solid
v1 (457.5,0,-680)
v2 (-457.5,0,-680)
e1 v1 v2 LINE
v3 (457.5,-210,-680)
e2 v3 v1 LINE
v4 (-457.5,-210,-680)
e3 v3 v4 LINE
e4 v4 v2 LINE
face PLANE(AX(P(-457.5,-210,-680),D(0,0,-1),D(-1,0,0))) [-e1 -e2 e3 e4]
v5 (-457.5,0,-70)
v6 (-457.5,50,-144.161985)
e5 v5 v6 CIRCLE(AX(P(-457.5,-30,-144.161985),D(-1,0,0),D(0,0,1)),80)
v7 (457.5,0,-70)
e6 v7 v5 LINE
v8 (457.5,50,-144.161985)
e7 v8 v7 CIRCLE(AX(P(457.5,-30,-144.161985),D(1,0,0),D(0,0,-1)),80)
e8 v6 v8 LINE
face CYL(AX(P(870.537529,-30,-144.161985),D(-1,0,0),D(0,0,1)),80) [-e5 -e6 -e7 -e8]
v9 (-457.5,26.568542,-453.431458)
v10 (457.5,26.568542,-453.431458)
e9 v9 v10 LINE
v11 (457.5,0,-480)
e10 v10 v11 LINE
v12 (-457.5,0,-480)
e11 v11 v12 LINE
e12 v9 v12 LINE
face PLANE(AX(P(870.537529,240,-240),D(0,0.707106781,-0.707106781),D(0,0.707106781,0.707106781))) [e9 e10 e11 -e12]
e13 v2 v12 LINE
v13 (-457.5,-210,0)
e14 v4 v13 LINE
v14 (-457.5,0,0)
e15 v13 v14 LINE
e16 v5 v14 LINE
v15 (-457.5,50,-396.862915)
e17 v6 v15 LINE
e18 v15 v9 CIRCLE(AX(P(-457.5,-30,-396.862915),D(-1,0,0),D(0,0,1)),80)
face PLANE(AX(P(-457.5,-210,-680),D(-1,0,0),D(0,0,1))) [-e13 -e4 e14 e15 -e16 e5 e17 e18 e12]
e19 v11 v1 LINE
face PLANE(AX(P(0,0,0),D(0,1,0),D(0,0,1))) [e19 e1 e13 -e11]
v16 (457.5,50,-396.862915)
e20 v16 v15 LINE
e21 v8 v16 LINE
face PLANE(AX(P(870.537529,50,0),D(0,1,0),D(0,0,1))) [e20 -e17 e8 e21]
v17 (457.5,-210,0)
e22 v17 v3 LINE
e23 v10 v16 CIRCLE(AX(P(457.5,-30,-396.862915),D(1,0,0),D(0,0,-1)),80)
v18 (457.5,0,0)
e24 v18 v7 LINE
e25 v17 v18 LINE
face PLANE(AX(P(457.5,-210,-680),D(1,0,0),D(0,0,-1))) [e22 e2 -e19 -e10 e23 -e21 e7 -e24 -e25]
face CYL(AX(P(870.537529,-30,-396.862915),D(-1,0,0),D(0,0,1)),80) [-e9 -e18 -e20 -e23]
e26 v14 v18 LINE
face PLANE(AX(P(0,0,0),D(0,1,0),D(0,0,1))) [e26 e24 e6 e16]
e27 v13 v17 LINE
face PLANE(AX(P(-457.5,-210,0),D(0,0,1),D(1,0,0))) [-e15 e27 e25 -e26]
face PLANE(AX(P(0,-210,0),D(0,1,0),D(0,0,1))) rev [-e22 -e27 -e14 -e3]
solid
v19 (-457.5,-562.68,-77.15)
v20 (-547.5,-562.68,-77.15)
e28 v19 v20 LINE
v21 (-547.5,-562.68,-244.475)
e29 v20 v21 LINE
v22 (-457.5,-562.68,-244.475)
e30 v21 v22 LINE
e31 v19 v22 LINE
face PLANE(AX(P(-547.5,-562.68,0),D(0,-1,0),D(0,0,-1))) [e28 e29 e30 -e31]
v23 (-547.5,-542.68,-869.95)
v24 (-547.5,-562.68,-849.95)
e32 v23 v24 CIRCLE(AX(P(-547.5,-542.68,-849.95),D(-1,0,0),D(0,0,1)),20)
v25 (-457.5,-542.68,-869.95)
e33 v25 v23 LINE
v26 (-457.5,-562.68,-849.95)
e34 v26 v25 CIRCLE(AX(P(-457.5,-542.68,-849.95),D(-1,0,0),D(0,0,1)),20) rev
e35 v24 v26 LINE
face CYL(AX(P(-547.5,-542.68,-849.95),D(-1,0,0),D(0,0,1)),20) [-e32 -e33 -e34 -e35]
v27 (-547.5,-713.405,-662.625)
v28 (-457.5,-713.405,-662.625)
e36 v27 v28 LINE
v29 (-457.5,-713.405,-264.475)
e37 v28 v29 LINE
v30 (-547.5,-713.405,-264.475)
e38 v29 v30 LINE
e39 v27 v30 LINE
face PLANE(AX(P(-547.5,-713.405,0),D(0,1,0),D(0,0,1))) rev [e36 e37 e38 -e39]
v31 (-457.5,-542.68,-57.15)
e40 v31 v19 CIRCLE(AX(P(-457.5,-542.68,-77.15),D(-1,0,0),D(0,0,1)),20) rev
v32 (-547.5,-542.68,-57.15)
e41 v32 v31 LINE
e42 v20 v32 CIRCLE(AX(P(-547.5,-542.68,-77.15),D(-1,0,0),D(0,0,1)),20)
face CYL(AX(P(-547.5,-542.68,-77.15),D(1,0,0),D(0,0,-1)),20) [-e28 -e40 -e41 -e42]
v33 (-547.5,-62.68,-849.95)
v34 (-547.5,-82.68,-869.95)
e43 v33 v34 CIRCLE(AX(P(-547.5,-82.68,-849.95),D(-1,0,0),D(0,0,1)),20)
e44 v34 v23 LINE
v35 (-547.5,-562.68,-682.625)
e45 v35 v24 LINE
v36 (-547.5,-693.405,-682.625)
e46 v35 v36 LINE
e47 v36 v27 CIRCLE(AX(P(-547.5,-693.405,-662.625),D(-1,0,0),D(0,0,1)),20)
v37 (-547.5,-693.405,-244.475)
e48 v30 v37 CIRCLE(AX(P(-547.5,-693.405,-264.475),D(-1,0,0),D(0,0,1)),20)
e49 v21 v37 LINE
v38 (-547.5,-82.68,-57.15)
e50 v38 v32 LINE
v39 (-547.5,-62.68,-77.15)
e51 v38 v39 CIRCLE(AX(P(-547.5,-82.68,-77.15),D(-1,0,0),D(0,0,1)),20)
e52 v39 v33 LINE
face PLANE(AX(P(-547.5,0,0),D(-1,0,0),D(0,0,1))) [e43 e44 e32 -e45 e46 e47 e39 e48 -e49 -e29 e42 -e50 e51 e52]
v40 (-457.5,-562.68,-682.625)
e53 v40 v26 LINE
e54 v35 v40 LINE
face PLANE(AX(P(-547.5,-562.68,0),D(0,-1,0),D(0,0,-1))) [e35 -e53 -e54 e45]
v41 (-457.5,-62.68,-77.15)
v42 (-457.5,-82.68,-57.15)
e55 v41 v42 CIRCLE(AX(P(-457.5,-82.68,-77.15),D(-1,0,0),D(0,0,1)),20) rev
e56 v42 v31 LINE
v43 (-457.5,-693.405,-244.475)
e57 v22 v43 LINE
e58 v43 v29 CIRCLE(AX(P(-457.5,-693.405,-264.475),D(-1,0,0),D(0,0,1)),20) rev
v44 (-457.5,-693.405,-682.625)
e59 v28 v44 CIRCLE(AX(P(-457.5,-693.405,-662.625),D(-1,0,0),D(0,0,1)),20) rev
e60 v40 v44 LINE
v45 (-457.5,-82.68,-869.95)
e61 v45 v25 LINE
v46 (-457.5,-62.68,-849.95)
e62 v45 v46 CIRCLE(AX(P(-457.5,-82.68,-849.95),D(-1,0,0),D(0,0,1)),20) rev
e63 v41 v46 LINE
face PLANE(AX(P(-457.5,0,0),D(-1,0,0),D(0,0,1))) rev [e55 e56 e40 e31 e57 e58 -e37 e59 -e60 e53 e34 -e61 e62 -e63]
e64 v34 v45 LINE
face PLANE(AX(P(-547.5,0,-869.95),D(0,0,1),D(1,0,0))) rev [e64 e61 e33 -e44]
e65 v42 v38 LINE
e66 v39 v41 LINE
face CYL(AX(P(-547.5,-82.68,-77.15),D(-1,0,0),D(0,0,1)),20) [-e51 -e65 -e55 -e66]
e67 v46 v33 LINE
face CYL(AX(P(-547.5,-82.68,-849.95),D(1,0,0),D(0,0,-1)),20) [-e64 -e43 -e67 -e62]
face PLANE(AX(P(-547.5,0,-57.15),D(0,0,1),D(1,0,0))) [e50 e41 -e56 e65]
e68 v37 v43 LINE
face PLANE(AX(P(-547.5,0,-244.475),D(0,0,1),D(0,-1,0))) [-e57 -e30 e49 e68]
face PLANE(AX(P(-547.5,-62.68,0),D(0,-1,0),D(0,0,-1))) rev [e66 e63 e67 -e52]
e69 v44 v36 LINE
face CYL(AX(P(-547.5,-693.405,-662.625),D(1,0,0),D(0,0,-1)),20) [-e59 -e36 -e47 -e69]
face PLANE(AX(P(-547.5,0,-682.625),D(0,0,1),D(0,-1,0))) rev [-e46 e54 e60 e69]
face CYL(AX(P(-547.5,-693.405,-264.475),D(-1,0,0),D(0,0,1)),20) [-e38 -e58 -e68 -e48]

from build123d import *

# Parameters (mm, degrees)
SKETCH1_W           = 915
SKETCH1_H           = 680
BOSS_EXTRUDE1_DEPTH = 210
BOSS_EXTRUDE2_DEPTH = 915
FILLET1_R           = 80
SKETCH5_W           = 438.15
SKETCH5_H           = 150.725
SKETCH5_W_2         = 622.85
SKETCH5_H_2         = 147.32
BOSS_EXTRUDE3_DEPTH = 90
FILLET2_R           = 20


with BuildPart() as part:
    # Sketch1 → Boss-Extrude1 (new body)
    with BuildSketch(Plane(origin=(0, 0, 0), x_dir=(1, 0, 0), z_dir=(0, 1, 0))):
        with Locations((0, 340)):
            Rectangle(SKETCH1_W, SKETCH1_H)
    extrude(amount=-BOSS_EXTRUDE1_DEPTH)

    # Sketch3 → Boss-Extrude2 (add)
    with BuildSketch(Plane.ZY.offset(457.5)):
        Polygon((-70, 0), (-70, 50), (-430, 50), (-480, 0), align=None)
    extrude(amount=-BOSS_EXTRUDE2_DEPTH)

    # Fillet1
    # the kernel refuses this fillet: 80 mm, written as the material it takes off along each edge
    with BuildSketch(Plane(origin=(-642.904962177, 50, -70), x_dir=(0, -1, 0), z_dir=(1, 0, 0))) as fillet1_piece_1:
        with BuildLine():
            CenterArc((80, 74.161984871), FILLET1_R, 180, 67.975687163)
            Line((0, 74.161984871), (-1.6, 74.161984871))
            Line((-1.6, 74.161984871), (-1.6, 0))
            Line((-1.6, 0), (0, -1.6))
            ThreePointArc((0, -1.6), (25, -1.6), (49.4, -1.483239697))
            Line((49.4, -1.483239697), (50, 0))
        make_face()
    extrude(amount=1285.809924355, mode=Mode.SUBTRACT)
    with BuildSketch(Plane(origin=(-540.342712475, 50, -430), x_dir=(0, -0.7071067811865477, -0.7071067811865474), z_dir=(1, 0, 0))) as fillet1_piece_2:
        with BuildLine():
            CenterArc((FILLET1_R * 0.414213562373, -FILLET1_R), FILLET1_R, 90, 45)
            Line((-FILLET1_R * 0.292893218813, -FILLET1_R * 0.292893218813), (-FILLET1_R * 0.307035354437, -FILLET1_R * 0.27875108319))
            Line((-FILLET1_R * 0.307035354437, -FILLET1_R * 0.27875108319), (-FILLET1_R * 0.00828427124746, FILLET1_R * 0.02))
            Line((-FILLET1_R * 0.00828427124746, FILLET1_R * 0.02), (FILLET1_R * 0.414213562373, FILLET1_R * 0.02))
            Line((FILLET1_R * 0.414213562373, FILLET1_R * 0.02), (FILLET1_R * 0.414213562373, 0))
        make_face()
    extrude(amount=1080.685424949, mode=Mode.SUBTRACT)


with BuildPart() as body_2:
    # Sketch5 → Boss-Extrude3 (new body)
    with BuildSketch(Plane.ZY.offset(457.5)):
        Polygon((-680, -210), (-680, -62.68), (-869.95, -62.68), (-869.95, -562.68), (-682.625, -562.68), (-244.475, -562.68), (-57.15, -562.68), (-57.15, -210), align=None)
        with Locations((-463.55, -638.0425)):
            Rectangle(SKETCH5_W, SKETCH5_H)
        with Locations((-368.575, -136.34)):
            Rectangle(SKETCH5_W_2, SKETCH5_H_2)
    extrude(amount=BOSS_EXTRUDE3_DEPTH)

    # Fillet2
    fillet2_edges = [body_2.edges().sort_by_distance(p)[0] for p in [
        (-502.5, -562.68, -57.15),
        (-502.5, -713.405, -244.475),
        (-502.5, -713.405, -682.625),
        (-502.5, -562.68, -869.95),
        (-502.5, -62.68, -869.95),
        (-502.5, -62.68, -57.15),
    ]]
    fillet(fillet2_edges, radius=FILLET2_R)


solid = Compound([part.part, body_2.part])
